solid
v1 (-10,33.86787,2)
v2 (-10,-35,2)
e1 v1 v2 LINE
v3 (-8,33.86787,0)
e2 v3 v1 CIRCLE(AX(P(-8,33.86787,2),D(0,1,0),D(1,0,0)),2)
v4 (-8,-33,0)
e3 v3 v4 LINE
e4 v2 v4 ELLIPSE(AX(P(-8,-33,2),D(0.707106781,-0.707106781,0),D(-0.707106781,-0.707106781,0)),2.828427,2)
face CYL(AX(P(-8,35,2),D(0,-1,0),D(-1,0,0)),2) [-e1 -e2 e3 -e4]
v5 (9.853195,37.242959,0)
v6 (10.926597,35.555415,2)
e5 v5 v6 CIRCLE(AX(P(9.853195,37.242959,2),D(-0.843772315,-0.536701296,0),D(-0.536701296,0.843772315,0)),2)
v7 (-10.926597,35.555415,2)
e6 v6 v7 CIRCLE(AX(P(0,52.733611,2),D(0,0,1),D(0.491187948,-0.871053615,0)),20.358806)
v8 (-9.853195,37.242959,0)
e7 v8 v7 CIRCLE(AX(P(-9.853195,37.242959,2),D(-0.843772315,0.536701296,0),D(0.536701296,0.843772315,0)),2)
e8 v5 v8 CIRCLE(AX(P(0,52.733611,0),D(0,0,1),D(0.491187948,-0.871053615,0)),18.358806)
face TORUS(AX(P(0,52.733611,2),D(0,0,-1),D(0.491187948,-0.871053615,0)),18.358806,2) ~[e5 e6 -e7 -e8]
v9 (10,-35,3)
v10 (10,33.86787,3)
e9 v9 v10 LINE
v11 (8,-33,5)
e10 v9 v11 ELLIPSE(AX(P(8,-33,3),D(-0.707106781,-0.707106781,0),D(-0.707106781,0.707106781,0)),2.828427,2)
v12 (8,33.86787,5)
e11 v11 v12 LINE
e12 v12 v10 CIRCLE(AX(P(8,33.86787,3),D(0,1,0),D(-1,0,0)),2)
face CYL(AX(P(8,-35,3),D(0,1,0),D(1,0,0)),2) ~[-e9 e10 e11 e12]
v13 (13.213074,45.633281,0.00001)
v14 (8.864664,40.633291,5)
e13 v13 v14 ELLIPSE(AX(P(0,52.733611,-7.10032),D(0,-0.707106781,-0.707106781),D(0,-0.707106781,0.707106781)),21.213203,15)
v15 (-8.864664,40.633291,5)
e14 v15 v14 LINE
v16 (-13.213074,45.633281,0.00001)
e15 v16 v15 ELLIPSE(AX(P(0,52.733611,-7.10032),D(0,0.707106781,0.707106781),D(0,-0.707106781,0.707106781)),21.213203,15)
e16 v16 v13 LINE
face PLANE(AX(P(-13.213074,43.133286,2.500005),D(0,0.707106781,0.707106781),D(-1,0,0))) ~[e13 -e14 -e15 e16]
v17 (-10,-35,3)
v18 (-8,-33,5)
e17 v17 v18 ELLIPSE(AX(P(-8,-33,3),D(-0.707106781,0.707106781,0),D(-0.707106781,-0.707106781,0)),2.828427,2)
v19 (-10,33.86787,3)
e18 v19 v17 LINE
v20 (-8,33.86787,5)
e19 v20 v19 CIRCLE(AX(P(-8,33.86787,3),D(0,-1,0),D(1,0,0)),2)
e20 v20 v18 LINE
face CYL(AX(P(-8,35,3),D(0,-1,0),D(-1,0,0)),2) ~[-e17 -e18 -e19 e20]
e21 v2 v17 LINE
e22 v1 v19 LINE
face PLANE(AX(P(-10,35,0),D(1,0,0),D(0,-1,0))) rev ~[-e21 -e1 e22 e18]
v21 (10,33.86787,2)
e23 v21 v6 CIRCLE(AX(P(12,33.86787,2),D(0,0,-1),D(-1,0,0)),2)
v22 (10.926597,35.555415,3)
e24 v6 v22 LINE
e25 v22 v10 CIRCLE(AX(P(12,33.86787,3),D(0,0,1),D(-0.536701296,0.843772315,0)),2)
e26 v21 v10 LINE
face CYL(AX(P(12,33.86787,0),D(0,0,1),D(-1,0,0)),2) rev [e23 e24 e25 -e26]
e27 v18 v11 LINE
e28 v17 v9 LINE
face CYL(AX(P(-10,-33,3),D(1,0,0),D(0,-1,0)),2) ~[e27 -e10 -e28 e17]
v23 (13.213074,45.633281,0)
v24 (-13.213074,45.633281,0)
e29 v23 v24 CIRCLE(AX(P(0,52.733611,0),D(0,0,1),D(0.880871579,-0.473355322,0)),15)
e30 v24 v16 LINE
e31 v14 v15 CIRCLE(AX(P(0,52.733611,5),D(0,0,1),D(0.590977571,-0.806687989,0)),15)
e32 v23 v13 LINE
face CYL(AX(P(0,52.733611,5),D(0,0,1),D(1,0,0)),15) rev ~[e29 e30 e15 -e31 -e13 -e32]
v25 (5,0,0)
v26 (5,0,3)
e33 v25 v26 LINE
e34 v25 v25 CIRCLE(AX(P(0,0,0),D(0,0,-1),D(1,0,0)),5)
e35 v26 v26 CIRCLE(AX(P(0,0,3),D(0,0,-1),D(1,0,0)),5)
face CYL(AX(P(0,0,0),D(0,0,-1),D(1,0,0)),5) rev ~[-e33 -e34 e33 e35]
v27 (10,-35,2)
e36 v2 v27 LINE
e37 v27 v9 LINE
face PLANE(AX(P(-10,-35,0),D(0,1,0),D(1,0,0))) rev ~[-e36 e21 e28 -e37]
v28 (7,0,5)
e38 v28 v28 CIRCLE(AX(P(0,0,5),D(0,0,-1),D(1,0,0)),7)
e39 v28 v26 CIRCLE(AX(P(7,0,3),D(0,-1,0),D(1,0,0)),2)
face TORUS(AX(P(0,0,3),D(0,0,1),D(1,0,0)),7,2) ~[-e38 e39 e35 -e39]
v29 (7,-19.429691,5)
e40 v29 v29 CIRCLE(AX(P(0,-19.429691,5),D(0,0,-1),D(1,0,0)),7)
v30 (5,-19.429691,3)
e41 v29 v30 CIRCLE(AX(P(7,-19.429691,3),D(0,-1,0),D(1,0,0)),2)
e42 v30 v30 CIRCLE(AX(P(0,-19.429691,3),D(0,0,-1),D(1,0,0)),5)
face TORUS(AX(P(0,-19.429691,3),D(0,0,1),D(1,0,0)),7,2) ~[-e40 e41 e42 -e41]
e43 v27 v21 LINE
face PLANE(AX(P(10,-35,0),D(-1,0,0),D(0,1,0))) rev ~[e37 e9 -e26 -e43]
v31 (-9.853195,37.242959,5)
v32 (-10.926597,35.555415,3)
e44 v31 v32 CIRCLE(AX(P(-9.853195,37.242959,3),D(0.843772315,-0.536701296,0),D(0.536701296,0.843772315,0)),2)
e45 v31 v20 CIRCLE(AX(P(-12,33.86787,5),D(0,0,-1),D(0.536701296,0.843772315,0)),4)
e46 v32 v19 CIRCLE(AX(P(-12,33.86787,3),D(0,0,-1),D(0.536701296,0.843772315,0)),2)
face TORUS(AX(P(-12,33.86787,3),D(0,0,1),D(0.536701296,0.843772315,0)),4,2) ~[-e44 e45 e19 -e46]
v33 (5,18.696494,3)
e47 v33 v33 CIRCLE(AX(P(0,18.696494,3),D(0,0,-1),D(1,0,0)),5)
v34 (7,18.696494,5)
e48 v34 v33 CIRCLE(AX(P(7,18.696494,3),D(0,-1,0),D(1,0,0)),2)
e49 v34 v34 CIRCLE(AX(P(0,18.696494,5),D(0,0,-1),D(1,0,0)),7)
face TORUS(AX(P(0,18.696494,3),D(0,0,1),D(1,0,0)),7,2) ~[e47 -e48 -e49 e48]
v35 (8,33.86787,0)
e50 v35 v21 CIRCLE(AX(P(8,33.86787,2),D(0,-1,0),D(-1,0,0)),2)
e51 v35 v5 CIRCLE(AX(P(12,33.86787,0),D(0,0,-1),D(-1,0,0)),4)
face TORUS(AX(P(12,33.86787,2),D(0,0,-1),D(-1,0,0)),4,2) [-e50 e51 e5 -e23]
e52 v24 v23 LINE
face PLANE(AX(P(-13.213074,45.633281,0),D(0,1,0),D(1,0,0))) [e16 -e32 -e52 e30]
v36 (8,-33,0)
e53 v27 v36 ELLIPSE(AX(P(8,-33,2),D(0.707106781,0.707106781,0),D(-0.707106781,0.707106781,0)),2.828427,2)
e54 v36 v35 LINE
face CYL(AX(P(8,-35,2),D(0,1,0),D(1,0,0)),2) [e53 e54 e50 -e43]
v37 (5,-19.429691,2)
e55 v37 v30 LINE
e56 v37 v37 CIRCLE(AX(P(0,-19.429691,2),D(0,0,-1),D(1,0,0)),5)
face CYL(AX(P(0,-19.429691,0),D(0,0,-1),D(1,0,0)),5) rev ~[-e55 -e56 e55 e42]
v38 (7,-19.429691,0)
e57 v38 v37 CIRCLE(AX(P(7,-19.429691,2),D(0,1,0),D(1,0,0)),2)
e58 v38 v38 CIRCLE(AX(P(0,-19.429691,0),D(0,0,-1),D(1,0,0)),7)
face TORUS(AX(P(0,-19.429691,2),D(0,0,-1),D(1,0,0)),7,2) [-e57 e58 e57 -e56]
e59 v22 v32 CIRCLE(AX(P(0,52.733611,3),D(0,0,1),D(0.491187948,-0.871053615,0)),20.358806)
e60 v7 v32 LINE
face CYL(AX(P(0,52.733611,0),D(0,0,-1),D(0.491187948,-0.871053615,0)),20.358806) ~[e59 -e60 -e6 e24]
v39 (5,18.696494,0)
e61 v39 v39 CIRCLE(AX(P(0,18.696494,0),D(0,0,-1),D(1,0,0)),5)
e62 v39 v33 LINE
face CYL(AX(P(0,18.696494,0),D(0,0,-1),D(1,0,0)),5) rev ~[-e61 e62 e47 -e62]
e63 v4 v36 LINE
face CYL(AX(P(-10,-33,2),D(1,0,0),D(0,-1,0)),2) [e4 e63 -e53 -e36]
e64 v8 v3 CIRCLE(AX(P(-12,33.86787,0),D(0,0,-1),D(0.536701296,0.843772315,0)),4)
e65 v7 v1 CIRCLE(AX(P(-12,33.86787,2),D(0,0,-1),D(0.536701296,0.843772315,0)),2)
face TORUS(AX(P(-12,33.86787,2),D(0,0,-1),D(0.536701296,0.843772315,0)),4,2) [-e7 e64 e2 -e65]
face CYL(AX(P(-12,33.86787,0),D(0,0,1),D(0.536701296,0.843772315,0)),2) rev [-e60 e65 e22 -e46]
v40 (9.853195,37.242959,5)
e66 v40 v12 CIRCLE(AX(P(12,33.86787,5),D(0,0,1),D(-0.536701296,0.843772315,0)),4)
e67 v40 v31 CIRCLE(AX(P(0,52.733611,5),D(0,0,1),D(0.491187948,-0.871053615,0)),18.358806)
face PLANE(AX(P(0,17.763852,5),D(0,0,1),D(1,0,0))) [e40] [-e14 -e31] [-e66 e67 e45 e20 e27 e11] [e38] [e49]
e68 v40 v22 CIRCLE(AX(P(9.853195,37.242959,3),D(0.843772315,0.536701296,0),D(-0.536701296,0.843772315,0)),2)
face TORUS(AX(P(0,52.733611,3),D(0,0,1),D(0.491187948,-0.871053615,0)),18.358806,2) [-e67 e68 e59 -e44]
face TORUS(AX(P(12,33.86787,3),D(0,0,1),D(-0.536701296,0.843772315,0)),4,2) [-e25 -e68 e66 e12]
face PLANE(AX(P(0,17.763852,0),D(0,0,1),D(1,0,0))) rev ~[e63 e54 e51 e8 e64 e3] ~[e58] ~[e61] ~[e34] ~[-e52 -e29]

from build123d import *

# Parameters (mm, degrees)
F1_DEPTH = 5
F2_R     = 2
F3_R     = 15
F4_DEPTH = 25.4
F5_R     = 5
F6_DEPTH = 25.4
F7_R     = 2
F9_DEPTH = 5
F10_SIZE = 4.99999


# Not quite as in the source:
# - a fillet or chamfer is up to 0.001 mm smaller than in the source, because OpenCascade refuses the exact size


with BuildPart() as f1:
    # F0 (on Top) → F1 (new body)
    with BuildSketch(Plane.XY):
        with BuildLine():
            Line((-10, -35), (10, -35))
            Line((10, -35), (10, 35))
            ThreePointArc((10, 35), (0, 73.0924170341), (-10, 35))
            Line((-10, 35), (-10, -35))
        make_face()
    extrude(amount=F1_DEPTH)

    # F2
    f2_edges = [f1.edges().sort_by_distance(p)[0] for p in [
        (0, 73.092417, 5),
        (10, 0, 5),
        (-10, 0, 5),
        (0, -35, 5),
        (10, 0, 0),
        (0, 73.092417, 0),
        (-10, 0, 0),
        (-10, 35, 2.5),
        (10, 35, 2.5),
        (0, -35, 0),
    ]]
    fillet(f2_edges, radius=F2_R)

    # F3 (on face) → F4 (cut)
    with BuildSketch(Plane.XY.offset(5)):
        with Locations((0, 52.7336113155)):
            Circle(F3_R)
    extrude(amount=-F4_DEPTH, mode=Mode.SUBTRACT)

    # F5 (on face) → F6 (cut)
    with BuildSketch(Plane(origin=(0, 0, 0), x_dir=(1, 0, 0), z_dir=(0, 0, -1))):
        Circle(F5_R)
        with Locations((0, -18.6964944005)):
            Circle(F5_R)
        with Locations((0, 19.4296911359)):
            Circle(F5_R)
    extrude(amount=-F6_DEPTH, mode=Mode.SUBTRACT)

    # F7
    f7_edges = [f1.edges().sort_by_distance(p)[0] for p in [
        (-5, -19.429691, 0),
        (5, -19.429691, 2.5),
        (-5, -19.429691, 5),
        (-5, 0, 5),
        (-5, 18.696494, 5),
    ]]
    fillet(f7_edges, radius=F7_R)

    # F8 (on face) → F9 (join)
    with BuildSketch(Plane(origin=(0, 0, 0), x_dir=(1, 0, 0), z_dir=(0, 0, -1))):
        with BuildLine():
            ThreePointArc((13.2130736886, -45.6332814852), (0, -37.7336113155), (-13.2130736886, -45.6332814852))
            Line((-13.2130736886, -45.6332814852), (13.2130736886, -45.6332814852))
        make_face()
    extrude(amount=-F9_DEPTH)

    # F10 (size 5 in the source; OpenCascade refuses exactly that, so slightly less here)
    f10_edges = [f1.edges().sort_by_distance(p)[0] for p in [
        (0, 45.633281, 5),
    ]]
    chamfer(f10_edges, length=F10_SIZE)


solid = f1.part
